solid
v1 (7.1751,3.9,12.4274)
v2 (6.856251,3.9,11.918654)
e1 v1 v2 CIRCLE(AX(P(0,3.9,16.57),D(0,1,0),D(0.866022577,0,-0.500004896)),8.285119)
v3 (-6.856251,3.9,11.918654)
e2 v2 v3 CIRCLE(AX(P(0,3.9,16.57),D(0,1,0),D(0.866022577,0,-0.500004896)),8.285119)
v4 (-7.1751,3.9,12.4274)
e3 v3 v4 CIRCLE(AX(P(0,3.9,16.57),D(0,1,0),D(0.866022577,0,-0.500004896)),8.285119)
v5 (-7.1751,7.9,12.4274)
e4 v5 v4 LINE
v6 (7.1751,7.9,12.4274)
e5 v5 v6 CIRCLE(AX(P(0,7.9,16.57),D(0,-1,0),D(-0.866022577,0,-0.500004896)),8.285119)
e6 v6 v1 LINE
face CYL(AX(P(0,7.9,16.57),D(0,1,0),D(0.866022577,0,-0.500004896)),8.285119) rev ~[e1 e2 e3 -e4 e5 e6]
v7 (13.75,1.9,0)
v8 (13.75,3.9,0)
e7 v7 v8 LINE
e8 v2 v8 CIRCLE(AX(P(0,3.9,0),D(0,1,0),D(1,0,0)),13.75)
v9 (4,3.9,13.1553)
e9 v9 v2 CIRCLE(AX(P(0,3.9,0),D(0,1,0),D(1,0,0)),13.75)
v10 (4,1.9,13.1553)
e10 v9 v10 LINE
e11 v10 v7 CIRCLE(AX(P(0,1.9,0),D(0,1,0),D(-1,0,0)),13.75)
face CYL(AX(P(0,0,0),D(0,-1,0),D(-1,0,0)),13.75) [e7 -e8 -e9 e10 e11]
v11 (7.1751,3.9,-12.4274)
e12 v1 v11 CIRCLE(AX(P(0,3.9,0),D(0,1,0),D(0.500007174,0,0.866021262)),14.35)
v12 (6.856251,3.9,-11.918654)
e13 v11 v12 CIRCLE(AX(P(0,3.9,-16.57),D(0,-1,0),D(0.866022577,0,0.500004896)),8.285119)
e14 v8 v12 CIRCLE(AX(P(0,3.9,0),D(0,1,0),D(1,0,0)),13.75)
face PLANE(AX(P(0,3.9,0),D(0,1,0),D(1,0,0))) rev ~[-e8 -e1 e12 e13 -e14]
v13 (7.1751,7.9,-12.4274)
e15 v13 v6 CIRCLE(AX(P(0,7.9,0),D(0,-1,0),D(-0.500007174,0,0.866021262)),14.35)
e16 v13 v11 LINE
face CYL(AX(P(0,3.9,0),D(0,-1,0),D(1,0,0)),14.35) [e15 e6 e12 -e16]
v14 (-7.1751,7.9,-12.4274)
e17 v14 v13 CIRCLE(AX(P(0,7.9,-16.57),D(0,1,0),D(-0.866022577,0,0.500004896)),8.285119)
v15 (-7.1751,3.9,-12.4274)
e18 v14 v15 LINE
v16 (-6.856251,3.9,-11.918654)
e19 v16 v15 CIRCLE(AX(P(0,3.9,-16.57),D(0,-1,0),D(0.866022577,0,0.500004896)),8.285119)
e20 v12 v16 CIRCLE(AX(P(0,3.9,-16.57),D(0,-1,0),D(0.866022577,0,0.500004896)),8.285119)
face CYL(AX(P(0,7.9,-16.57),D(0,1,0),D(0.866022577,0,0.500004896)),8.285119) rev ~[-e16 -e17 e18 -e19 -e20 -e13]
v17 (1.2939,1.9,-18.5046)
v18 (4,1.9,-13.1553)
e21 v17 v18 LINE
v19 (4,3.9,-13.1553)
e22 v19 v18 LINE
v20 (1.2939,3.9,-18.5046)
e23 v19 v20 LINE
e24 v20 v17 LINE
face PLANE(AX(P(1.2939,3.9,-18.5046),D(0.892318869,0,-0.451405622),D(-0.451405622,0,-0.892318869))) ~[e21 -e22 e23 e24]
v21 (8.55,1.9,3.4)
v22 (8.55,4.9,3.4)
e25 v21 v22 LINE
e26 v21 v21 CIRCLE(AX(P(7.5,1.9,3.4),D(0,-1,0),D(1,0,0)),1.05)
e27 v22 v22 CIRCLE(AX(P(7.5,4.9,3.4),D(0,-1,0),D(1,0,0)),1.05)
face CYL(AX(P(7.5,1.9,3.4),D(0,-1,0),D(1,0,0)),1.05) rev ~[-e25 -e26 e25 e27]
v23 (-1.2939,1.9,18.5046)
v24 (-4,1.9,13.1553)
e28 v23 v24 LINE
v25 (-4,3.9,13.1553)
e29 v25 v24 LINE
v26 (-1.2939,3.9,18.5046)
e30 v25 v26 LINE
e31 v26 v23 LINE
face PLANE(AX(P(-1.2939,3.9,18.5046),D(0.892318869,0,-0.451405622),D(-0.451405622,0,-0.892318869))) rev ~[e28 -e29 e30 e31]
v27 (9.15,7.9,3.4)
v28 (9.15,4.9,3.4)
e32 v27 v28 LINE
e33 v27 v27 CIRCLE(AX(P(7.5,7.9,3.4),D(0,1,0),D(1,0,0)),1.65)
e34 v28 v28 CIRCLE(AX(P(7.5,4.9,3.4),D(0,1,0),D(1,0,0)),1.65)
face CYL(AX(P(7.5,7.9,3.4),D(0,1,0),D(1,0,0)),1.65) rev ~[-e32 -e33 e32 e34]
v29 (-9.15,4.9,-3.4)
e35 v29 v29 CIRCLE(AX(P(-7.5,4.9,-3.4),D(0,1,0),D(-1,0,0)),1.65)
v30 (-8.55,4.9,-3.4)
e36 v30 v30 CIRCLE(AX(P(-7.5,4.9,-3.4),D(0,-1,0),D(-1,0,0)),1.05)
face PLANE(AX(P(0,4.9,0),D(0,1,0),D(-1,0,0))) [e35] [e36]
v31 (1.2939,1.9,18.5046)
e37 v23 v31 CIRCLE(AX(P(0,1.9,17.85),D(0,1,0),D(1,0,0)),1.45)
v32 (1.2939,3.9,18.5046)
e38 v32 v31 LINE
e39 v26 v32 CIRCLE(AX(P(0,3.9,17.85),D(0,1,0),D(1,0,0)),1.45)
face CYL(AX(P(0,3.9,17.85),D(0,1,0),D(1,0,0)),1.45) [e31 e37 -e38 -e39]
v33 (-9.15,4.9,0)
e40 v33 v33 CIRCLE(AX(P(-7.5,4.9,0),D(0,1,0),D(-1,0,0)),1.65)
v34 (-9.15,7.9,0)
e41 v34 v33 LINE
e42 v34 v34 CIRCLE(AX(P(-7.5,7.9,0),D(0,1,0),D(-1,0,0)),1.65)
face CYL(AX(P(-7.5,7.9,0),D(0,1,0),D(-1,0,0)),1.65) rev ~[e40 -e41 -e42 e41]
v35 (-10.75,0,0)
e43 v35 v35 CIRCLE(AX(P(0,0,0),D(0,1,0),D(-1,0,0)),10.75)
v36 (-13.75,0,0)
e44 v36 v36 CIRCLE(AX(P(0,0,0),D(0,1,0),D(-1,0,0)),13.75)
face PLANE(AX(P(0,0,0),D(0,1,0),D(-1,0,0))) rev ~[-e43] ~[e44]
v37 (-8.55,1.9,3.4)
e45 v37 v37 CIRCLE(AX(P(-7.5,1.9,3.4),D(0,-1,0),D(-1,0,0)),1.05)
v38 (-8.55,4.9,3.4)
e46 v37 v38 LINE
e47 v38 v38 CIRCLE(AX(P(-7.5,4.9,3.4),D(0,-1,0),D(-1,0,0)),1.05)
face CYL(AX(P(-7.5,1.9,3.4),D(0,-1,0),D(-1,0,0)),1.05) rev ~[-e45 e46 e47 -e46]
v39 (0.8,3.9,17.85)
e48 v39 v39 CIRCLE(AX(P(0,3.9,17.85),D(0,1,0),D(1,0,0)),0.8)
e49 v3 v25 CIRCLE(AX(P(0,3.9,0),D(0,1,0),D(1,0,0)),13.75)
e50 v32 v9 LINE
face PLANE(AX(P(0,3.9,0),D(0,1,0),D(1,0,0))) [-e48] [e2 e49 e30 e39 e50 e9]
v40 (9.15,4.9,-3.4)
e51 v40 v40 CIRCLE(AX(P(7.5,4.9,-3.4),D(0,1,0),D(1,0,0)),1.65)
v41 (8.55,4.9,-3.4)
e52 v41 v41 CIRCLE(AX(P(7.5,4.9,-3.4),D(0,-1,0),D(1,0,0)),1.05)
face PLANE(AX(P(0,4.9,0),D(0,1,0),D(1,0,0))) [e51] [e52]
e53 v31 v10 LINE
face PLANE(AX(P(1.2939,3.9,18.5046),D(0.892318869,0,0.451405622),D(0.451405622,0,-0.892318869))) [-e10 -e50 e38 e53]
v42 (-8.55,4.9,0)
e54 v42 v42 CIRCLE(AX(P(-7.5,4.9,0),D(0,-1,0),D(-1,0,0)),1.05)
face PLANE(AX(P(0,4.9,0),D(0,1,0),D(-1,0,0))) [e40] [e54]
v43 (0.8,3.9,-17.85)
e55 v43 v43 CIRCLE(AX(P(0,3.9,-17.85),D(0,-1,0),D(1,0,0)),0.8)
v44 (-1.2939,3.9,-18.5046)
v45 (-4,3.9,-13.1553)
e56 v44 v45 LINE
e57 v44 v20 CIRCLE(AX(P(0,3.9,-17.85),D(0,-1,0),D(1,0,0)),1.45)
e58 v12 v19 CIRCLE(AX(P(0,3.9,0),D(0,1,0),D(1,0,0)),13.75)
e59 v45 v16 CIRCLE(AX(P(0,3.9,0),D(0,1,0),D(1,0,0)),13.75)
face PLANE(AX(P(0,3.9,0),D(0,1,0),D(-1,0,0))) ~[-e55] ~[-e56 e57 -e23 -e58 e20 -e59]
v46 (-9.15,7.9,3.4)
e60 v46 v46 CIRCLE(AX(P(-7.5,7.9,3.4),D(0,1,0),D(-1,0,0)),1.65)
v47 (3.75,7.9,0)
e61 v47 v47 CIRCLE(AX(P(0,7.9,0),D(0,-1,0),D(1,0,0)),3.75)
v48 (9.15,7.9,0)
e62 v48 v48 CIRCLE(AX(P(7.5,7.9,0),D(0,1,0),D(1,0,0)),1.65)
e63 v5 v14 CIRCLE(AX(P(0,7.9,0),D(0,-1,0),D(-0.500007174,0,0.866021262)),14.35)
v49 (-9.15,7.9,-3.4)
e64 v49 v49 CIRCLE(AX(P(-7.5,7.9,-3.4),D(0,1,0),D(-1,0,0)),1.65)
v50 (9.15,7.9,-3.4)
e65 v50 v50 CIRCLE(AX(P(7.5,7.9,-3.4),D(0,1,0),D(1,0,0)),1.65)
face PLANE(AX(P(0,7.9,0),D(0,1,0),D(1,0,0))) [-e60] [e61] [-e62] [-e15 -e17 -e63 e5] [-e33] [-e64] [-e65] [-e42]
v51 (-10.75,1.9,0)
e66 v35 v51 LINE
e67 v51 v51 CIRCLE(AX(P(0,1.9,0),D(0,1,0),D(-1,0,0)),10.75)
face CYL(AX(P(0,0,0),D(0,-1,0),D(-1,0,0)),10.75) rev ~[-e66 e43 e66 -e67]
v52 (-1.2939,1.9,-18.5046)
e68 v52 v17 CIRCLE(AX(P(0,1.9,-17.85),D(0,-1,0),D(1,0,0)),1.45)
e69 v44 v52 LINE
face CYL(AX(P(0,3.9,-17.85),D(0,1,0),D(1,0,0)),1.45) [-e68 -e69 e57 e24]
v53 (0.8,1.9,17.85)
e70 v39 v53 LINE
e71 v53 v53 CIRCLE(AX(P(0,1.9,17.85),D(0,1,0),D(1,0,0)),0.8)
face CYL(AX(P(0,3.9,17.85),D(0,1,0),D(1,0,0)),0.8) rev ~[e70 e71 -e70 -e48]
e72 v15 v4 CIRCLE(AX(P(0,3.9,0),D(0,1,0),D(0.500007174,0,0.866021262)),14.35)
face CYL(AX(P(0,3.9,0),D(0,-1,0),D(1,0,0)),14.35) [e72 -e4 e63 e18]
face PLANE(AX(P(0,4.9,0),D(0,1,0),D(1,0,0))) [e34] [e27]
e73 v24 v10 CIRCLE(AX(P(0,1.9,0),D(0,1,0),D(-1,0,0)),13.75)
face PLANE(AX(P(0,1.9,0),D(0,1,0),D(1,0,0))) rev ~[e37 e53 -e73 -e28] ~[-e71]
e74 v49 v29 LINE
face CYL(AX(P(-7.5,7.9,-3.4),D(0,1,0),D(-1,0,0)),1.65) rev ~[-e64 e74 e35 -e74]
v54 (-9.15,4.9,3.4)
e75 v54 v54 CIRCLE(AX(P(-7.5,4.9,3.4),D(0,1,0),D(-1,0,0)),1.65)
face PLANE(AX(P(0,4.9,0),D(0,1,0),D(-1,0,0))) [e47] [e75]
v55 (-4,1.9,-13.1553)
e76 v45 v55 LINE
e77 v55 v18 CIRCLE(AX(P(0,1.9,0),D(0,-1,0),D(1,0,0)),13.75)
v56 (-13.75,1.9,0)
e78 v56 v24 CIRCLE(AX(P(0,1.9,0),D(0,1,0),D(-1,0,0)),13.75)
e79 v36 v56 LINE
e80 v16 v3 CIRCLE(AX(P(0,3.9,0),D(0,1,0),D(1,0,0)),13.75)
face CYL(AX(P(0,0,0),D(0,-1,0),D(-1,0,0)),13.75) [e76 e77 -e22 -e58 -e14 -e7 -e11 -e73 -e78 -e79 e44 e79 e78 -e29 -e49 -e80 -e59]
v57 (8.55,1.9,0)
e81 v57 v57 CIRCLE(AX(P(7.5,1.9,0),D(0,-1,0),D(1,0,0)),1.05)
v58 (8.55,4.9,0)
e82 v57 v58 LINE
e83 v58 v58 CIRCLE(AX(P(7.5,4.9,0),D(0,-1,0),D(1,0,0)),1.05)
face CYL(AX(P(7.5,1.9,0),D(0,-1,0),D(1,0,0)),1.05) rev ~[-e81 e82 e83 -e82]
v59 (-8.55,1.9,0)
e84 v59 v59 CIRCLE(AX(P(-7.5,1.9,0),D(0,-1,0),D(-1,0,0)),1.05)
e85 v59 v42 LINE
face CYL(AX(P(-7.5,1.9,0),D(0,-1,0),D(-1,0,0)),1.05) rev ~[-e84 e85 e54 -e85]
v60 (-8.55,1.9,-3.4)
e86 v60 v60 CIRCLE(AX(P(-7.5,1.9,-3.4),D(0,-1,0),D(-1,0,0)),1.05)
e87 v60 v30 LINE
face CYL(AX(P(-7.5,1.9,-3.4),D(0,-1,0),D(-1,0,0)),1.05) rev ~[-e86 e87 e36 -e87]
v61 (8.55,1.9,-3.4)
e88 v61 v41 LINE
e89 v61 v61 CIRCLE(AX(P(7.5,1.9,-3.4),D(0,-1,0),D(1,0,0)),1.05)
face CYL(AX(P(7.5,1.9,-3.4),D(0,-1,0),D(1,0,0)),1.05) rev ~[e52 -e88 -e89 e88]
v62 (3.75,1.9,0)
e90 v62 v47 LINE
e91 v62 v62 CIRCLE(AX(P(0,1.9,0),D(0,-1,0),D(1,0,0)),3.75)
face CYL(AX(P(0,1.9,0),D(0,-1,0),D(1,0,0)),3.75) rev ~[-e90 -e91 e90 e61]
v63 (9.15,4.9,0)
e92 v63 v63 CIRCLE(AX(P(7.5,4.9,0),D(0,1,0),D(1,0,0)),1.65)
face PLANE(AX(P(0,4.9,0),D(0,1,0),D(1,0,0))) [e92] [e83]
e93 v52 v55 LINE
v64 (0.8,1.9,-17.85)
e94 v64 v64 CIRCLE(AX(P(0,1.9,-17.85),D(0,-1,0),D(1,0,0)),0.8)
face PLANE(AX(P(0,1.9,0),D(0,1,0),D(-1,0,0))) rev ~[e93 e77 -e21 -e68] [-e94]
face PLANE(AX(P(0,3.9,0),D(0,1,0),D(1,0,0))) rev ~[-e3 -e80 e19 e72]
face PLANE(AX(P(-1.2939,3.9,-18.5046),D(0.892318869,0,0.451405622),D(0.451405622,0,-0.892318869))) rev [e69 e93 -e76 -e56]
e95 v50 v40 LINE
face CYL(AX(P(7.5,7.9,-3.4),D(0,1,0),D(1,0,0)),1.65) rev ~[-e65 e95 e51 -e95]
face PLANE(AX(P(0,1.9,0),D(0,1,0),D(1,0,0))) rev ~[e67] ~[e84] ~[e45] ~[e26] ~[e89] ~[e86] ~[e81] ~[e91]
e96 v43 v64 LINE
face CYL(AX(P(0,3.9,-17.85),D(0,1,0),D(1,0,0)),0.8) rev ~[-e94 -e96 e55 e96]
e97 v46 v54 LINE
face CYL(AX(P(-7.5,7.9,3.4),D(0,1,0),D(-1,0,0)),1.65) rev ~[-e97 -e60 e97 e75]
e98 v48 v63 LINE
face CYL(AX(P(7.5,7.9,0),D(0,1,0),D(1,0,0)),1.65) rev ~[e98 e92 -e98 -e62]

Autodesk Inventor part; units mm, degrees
ref_plane "YZ Plane" through (0, 0, 0) normal (1, 0, 0) x (0, 1, 0)
ref_plane "XZ Plane" through (0, 0, 0) normal (0, 1, 0) x (-1, 0, 0)
ref_plane "XY Plane" through (0, 0, 0) normal (0, 0, 1) x (1, 0, 0)
sketch "Sketch1" plane through (0, 0, 0) normal (0, 1, 0) x (-1, 0, 0)
  circle A0 centre (0, 0) radius 10.75
  circle A1 centre (0, 0) radius 13.75
  dimension "d0" = 21.5
  dimension "d1" = 3
extrude "Extrusion1" add sketch "Sketch1" along normal blind 1.9
sketch "Sketch2" plane through (0, 1.9, 0) normal (0, 1, 0) x (1, 0, 0)
  circle A0 centre (0, 0) radius 13.75 projected
extrude "Extrusion2" add sketch "Sketch2" along normal blind 2
sketch "Sketch3" plane through (0, 3.9, 0) normal (0, 1, 0) x (1, 0, 0)
  circle A0 centre (0, 0) radius 1.75
  dimension "d6" = 3.5
extrude "Extrusion3" cut sketch "Sketch3" along normal through all both and the other way through all
sketch "Sketch4" plane through (0, 1.9, 0) normal (0, -1, 0) x (1, 0, 0)
  circle A0 centre (7.5, 0.0066) radius 0.95
  circle A1 centre (7.5, -3.3934) radius 0.95
  circle A2 centre (7.5, 3.4066) radius 0.95
  point P0 (0, 0)
  dimension "d9" = 1.9
  dimension "d10" = 1.9
  dimension "d11" = 1.9
  dimension "d12" = 7.5
  dimension "d13" = 7.5
  dimension "d14" = 7.5
  dimension "d15" = 3.4
  dimension "d16" = 3.4
extrude "Extrusion4" [suppressed]
pattern_circular "Circular Pattern1" [suppressed]
sketch "Sketch5" plane through (0, 3.9, 0) normal (0, 1, 0) x (1, 0, 0)
  circle A0 centre (0, -17.85) radius 0.8
  circle A1 centre (0, -17.85) radius 1.45
  circle A2 centre (0, 0) radius 13.75 projected
  line L0 (-1.2939, -18.5046) -> (-4, -13.1553)
  line L1 (1.2939, -18.5046) -> (4, -13.1553)
  dimension "d22" = 1.6
  dimension "d23" = 17.85
  dimension "d24" = 2.9
  dimension "d25" = 0
  dimension "d26" = 4
  dimension "d27" = 4
extrude "Extrusion5" add sketch "Sketch5" against normal blind 2 contours A1 | A1 L0 A2 L1
sketch "Sketch6" plane through (0, 3.9, 0) normal (0, 1, 0) x (1, 0, 0)
  circle A0 centre (0, 0) radius 14.35
  dimension "d30" = 28.7
extrude "Extrusion6" add sketch "Sketch6" along normal blind 4
sketch "Sketch7" plane through (0, 7.9, 0) normal (0, 1, 0) x (1, 0, 0)
  circle A0 centre (0, 0) radius 1.75 projected
  line L0 (0, 0) -> (0, -16.57)
  line L1 (0, -16.57) -> (7.1751, -12.4274)
  line L2 (7.1751, -12.4274) -> (0, 0)
  circle A1 centre (0, 0) radius 14.35 projected
  arc A2 (7.1751, -12.4274) -> (-7.1751, -12.4274) centre (0, -16.57) ccw
  arc A3 (-7.1751, -12.4274) -> (7.1751, -12.4274) centre (0, 0) ccw
  dimension "d33" = 16.57
extrude "Extrusion7" cut sketch "Sketch7" against normal blind 4 contours A2 A1 L0 | L0 A1 A2
sketch "Sketch8" plane through (0, 1.9, 0) normal (0, -1, 0) x (1, 0, 0)
  circle A0 centre (-3.4066, 7.5) radius 0.95 projected
  arc A1 (-7.1751, 12.4274) -> (-6.8562, 11.9187) centre (0, 16.57) ccw projected
  circle A2 centre (-0.0066, 7.5) radius 0.95 projected
  circle A3 centre (3.3934, 7.5) radius 0.95 projected
  circle A4 centre (7.5, 3.4066) radius 0.95 projected
  circle A5 centre (7.5, 0.0066) radius 0.95 projected
  circle A6 centre (7.5, -3.3934) radius 0.95 projected
  circle A7 centre (3.4066, -7.5) radius 0.95 projected
  circle A8 centre (0.0066, -7.5) radius 0.95 projected
  circle A9 centre (-3.3934, -7.5) radius 0.95 projected
  circle A10 centre (-7.5, -3.4066) radius 0.95 projected
  circle A11 centre (-7.5, -0.0066) radius 0.95 projected
  circle A12 centre (-7.5, 3.3934) radius 0.95 projected
  circle A13 centre (0, 0) radius 1.75 projected
  arc A14 (-7.1751, 12.4274) -> (7.1751, 12.4274) centre (0, 0) ccw projected
  arc A15 (6.8562, 11.9187) -> (7.1751, 12.4274) centre (0, 16.57) ccw projected
  arc A16 (-6.8562, 11.9187) -> (6.8562, 11.9187) centre (0, 0) ccw projected
  point P0 (0.5052, 8.3003)
  point P1 (-0.5172, 8.3011)
extrude "Extrusion8" [suppressed]
sketch "Sketch9" plane through (0, 1.9, 0) normal (0, -1, 0) x (1, 0, 0)
  circle A0 centre (0, 0) radius 3.75
  dimension "d38" = 7.5
extrude "Extrusion9" cut sketch "Sketch9" against normal through all
sketch "Sketch10" plane through (0, 1.9, 0) normal (0, -1, 0) x (1, 0, 0)
  circle A0 centre (7.5, 3.4) radius 1.05
  circle A1 centre (7.5, 0) radius 1.05
  circle A2 centre (7.5, -3.4) radius 1.05
  point P0 (0, 0)
  dimension "d41" = 2.1
  dimension "d42" = 2.1
  dimension "d43" = 2.1
  dimension "d44" = 0
  dimension "d45" = 7.5
  dimension "d46" = 7.5
  dimension "d47" = 7.5
  dimension "d48" = 3.4
  dimension "d49" = 3.4
extrude "Extrusion10" cut sketch "Sketch10" against normal through all
pattern_circular "Circular Pattern2" [suppressed]
pattern_circular "Circular Pattern4" count 2 over 360 about axis through (0, -10, 0) along (0, 1, 0) of "Extrusion10"
sketch "Sketch11" plane through (0, 7.9, 0) normal (0, 1, 0) x (1, 0, 0)
  circle A0 centre (7.5, -3.4) radius 1.05 projected
  circle A1 centre (7.5, 0) radius 1.05 projected
  circle A2 centre (7.5, 3.4) radius 1.05 projected
  circle A3 centre (7.5, -3.4) radius 1.65
  circle A4 centre (7.5, 0) radius 1.65
  circle A5 centre (7.5, 3.4) radius 1.65
  point P0 (0, 0)
  dimension "d61" = 3.3
  dimension "d62" = 3.3
  dimension "d63" = 3.3
extrude "Extrusion11" cut sketch "Sketch11" against normal blind 3 contours A0 | A1 | A2 | A3 | A4 | A5
pattern_circular "Circular Pattern5" count 2 over 360 about axis through (0, -10, 0) along (0, 1, 0) of "Extrusion11"
pattern_circular "Circular Pattern6" [suppressed]
mirror "Mirror1" about plane through (0, 0, 0) normal (0, 0, 1) of "Extrusion5"
mirror "Mirror2" about plane through (0, 0, 0) normal (0, 0, 1) of "Extrusion7"
equation "\"d13\" = d12"
equation "\"d14\" = d12"
equation "\"d16\" = d15"
equation "\"d27\" = d26"
equation "\"d46\" = d45"
equation "\"d47\" = d45"
equation "\"d49\" = d48"
properties part number "pin_r1"
